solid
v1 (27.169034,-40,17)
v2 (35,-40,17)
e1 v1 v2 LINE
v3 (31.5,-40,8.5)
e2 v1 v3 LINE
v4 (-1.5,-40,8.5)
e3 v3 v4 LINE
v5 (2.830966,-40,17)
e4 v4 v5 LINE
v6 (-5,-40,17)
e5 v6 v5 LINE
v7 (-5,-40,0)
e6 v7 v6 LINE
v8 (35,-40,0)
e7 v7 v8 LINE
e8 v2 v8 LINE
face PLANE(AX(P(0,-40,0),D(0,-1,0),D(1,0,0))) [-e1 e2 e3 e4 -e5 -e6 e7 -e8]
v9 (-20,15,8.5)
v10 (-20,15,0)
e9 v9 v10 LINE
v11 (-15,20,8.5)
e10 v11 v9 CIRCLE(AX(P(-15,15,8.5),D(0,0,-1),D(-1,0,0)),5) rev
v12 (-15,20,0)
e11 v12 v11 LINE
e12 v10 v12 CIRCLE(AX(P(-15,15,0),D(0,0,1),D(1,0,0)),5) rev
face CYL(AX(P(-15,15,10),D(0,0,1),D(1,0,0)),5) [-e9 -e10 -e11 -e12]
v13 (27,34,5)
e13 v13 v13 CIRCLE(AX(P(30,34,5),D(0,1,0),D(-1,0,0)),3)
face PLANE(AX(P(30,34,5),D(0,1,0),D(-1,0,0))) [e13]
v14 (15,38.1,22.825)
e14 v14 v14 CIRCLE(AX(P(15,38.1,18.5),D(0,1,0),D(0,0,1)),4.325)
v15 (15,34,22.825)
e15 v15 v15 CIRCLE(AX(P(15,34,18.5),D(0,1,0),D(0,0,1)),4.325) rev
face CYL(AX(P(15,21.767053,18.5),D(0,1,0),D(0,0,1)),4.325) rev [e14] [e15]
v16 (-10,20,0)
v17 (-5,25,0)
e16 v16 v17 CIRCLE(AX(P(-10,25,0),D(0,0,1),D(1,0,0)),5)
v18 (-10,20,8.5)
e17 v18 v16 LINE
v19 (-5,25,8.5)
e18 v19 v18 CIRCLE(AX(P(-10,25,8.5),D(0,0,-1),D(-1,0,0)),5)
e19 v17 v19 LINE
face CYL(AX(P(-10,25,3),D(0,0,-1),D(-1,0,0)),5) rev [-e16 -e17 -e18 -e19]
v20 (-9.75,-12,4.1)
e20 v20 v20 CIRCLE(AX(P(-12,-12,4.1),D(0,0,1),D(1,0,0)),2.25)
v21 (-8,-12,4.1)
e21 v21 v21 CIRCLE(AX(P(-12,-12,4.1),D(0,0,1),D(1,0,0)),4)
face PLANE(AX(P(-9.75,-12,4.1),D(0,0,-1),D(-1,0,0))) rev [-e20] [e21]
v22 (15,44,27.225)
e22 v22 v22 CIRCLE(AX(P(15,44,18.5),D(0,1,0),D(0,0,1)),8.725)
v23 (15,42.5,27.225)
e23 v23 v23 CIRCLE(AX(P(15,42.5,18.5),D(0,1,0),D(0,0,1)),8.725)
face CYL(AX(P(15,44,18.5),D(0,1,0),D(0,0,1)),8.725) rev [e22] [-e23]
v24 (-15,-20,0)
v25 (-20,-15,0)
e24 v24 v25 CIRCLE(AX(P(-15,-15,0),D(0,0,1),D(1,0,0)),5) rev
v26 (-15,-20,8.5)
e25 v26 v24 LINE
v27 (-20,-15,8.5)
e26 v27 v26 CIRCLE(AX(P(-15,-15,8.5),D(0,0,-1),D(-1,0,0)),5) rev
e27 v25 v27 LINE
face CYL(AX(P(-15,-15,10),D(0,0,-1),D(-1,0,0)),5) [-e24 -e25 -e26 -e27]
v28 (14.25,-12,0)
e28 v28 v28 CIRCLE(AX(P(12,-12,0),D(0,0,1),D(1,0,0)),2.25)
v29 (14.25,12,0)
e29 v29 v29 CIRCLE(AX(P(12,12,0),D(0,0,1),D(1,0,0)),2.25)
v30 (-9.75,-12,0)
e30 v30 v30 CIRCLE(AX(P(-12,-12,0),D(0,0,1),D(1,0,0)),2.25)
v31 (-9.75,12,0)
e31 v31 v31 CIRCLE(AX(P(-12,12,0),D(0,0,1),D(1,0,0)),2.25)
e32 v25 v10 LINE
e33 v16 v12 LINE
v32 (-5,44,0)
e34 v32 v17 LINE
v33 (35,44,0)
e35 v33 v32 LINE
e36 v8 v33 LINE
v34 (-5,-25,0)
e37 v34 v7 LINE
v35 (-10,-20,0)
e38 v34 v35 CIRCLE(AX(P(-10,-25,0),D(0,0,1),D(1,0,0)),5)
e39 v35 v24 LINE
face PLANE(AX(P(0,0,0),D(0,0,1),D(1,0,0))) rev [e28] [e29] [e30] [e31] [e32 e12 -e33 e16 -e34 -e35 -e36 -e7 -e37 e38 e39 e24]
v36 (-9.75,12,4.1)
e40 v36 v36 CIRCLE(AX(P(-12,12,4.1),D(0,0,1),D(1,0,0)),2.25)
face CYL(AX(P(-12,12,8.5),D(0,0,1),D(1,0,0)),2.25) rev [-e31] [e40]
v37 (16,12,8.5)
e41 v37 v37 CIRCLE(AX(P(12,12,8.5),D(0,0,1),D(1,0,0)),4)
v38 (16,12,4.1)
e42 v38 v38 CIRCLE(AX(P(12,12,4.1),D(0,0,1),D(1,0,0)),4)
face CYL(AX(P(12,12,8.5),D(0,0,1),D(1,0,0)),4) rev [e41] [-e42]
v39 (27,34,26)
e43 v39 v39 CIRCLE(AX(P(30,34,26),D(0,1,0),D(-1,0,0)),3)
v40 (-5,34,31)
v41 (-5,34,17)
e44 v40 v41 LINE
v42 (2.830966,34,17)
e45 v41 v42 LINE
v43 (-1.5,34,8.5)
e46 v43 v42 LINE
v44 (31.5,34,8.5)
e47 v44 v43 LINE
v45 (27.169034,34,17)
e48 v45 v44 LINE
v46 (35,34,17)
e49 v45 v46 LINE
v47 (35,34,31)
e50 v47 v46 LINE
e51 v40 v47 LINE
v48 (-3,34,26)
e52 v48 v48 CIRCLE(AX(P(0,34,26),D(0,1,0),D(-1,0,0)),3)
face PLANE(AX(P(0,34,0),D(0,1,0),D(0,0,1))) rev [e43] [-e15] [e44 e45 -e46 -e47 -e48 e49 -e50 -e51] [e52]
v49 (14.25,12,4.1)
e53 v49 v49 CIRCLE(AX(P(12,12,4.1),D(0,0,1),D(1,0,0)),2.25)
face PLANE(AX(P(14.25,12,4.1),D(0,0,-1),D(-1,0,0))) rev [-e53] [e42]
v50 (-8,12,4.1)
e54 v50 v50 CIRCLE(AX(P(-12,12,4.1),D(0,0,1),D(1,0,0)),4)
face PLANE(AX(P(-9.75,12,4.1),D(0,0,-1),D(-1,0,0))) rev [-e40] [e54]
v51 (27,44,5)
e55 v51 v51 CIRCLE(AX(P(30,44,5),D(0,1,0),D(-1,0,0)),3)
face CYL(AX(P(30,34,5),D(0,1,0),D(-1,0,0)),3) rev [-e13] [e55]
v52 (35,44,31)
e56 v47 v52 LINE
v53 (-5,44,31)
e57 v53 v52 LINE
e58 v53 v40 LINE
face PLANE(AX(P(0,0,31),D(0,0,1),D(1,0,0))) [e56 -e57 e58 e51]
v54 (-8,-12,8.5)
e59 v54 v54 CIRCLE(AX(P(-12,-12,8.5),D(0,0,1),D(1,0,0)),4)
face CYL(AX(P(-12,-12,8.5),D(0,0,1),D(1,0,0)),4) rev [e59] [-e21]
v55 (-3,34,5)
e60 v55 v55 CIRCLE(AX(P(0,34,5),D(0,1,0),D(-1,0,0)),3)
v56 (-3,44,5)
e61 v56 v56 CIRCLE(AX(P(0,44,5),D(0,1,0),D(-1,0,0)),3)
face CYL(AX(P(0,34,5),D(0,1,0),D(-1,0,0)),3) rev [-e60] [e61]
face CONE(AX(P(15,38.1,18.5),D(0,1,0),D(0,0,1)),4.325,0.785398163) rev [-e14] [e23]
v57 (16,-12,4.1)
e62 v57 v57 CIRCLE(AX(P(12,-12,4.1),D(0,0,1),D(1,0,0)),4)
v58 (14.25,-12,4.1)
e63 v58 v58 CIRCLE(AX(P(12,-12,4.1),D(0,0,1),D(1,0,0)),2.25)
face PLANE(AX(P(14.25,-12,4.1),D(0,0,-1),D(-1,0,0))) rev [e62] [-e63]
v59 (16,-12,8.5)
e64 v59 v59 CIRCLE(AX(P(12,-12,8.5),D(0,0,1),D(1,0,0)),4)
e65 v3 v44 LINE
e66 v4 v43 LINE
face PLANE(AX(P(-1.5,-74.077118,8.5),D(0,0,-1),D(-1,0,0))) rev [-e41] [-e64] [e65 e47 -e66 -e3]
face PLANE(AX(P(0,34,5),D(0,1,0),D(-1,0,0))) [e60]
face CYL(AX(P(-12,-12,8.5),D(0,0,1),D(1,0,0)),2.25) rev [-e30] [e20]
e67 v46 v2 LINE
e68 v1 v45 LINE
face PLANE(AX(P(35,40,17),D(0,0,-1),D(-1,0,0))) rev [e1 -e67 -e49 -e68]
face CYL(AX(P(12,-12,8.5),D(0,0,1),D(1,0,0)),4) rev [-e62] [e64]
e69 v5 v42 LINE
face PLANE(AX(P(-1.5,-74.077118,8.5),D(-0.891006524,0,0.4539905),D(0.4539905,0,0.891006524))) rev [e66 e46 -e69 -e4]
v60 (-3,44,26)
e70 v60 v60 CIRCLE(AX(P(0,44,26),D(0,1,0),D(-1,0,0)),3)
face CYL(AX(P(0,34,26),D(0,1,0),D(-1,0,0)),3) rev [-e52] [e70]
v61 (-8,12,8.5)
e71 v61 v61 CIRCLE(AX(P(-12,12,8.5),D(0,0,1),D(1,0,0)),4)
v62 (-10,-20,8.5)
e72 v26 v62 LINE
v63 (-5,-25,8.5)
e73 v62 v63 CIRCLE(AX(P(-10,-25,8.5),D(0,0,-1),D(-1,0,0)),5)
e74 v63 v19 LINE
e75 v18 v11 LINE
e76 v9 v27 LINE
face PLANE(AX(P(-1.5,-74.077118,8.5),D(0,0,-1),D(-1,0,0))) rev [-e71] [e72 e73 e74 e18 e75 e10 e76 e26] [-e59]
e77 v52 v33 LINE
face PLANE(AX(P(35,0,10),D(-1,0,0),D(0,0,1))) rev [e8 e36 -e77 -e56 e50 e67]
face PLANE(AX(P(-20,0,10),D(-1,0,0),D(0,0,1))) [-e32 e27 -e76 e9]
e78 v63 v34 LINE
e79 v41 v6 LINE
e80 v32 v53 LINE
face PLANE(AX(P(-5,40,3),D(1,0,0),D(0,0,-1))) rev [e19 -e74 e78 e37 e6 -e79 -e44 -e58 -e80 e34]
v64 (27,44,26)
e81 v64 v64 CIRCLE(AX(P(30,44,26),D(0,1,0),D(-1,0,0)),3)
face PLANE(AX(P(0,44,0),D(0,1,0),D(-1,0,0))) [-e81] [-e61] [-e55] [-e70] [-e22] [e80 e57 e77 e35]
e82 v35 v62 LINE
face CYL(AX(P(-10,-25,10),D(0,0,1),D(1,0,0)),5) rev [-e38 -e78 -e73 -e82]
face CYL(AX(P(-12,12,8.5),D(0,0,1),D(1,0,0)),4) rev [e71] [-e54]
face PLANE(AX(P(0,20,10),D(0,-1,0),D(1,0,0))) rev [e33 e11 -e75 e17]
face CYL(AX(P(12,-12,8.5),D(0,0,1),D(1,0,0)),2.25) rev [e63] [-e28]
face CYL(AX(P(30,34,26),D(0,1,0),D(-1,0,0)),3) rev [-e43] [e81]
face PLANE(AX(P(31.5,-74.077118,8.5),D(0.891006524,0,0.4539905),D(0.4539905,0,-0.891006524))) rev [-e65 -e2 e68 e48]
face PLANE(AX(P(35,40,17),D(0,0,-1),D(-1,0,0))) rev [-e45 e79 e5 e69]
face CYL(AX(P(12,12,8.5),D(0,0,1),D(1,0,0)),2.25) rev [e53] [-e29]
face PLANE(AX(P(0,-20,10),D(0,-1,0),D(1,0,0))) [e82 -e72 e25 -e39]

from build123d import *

# Parameters (mm, degrees)
BOSS_EXTRUDE1_OUTLINE_W                             = 55
BOSS_EXTRUDE1_OUTLINE_H                             = 40
BOSS_EXTRUDE1_DEPTH                                 = 10
SKETCH5_W                                           = 40
SKETCH5_H                                           = 14
BOSS_EXTRUDE2_DEPTH                                 = 40
CUT_EXTRUDE3_DEPTH                                  = 74
SKETCH7_W                                           = 40
SKETCH7_H                                           = 6
BOSS_EXTRUDE3_DEPTH                                 = 14
SKETCH11_W                                          = 40
SKETCH11_H                                          = 28
BOSS_EXTRUDE5_DEPTH                                 = 4
SKETCH12_W                                          = 40
SKETCH12_H                                          = 24
SKETCH12_H_2                                        = 20
BOSS_EXTRUDE6_DEPTH                                 = 3
FILLET1_R                                           = 5
SKETCH23_R                                          = 3
CUT_EXTRUDE11_DEPTH                                 = 10
SKETCH26_R                                          = 4.325
CUT_EXTRUDE12_DEPTH                                 = 4.1
CUT_EXTRUDE13_DEPTH                                 = 1.5
CBORE_FOR_M4_HEX_SOCKET_HEAD_CAP_SCREW1_D           = 4.5
CBORE_FOR_M4_HEX_SOCKET_HEAD_CAP_SCREW1_CBORE_D     = 8
CBORE_FOR_M4_HEX_SOCKET_HEAD_CAP_SCREW1_CBORE_DEPTH = 4.4


# Read off the part's stored shape, not the designer's step: Boss-Extrude1
with BuildPart() as part:
    # Boss-Extrude1 outline → Boss-Extrude1 (new body)
    with BuildSketch(Plane.XY):
        with Locations((7.5, 0)):
            Rectangle(BOSS_EXTRUDE1_OUTLINE_W, BOSS_EXTRUDE1_OUTLINE_H)
    extrude(amount=BOSS_EXTRUDE1_DEPTH)

    # Sketch5 → Boss-Extrude2 (add, symmetric)
    with BuildSketch(Plane(origin=(0, 0, 0), x_dir=(1, 0, 0), z_dir=(0, 1, 0))):
        with Locations((15, -10)):
            Rectangle(SKETCH5_W, SKETCH5_H)
    extrude(amount=BOSS_EXTRUDE2_DEPTH, both=True)

    # Sketch6 → Cut-Extrude3 (cut)
    with BuildSketch(Plane(origin=(0, 34, 0), x_dir=(1, 0, 0), z_dir=(0, 1, 0))):
        Polygon((-1.5, -8.5), (31.5, -8.5), (27.169033679, -17), (2.830966321, -17), align=None)
    extrude(amount=-CUT_EXTRUDE3_DEPTH, mode=Mode.SUBTRACT)

    # Sketch7 → Boss-Extrude3 (add)
    with BuildSketch(Plane.XY.offset(17)):
        with Locations((15, 37)):
            Rectangle(SKETCH7_W, SKETCH7_H)
    extrude(amount=BOSS_EXTRUDE3_DEPTH)

    # Sketch11 → Boss-Extrude5 (add)
    with BuildSketch(Plane(origin=(0, 40, 0), x_dir=(1, 0, 0), z_dir=(0, 1, 0))):
        with Locations((15, -17)):
            Rectangle(SKETCH11_W, SKETCH11_H)
    extrude(amount=BOSS_EXTRUDE5_DEPTH)

    # Sketch12 → Boss-Extrude6 (add)
    with BuildSketch(Plane(origin=(0, 0, 3), x_dir=(-1, 0, 0), z_dir=(0, 0, -1))):
        with Locations((-15, 32)):
            Rectangle(SKETCH12_W, SKETCH12_H)
        with Locations((-15, -30)):
            Rectangle(SKETCH12_W, SKETCH12_H_2)
    extrude(amount=BOSS_EXTRUDE6_DEPTH)

    # Fillet1
    fillet1_edges = [part.edges().sort_by_distance(p)[0] for p in [
        (-5, -20, 5),
        (-5, 20, 5),
        (-20, 20, 5),
        (-20, -20, 5),
    ]]
    fillet(fillet1_edges, radius=FILLET1_R)

    # Sketch23 → Cut-Extrude11 (cut)
    with BuildSketch(Plane(origin=(0, 44, 0), x_dir=(1, 0, 0), z_dir=(0, 1, 0))):
        with Locations(Location((0, -5, 0), (0, 0, 180))):
            Circle(SKETCH23_R)
        with Locations(Location((30, -5, 0), (0, 0, 180))):
            Circle(SKETCH23_R)
        with Locations(Location((30, -26, 0), (0, 0, 180))):
            Circle(SKETCH23_R)
        with Locations(Location((0, -26, 0), (0, 0, 180))):
            Circle(SKETCH23_R)
    extrude(amount=-CUT_EXTRUDE11_DEPTH, mode=Mode.SUBTRACT)

    # Sketch25 → Cut-Revolve1 (revolve, cut)
    with BuildSketch(Plane.XY.offset(18.5), mode=Mode.PRIVATE) as cut_revolve1_sk:
        Polygon((15, 44), (15, 38.1), (19.325, 38.1), (23.725, 42.5), (23.725, 44), align=None)
    revolve(cut_revolve1_sk.sketch.rotate(Axis((15, 44, 18.5), (0, -1, 0)), 90), axis=Axis((15, 44, 18.5), (0, -1, 0)), mode=Mode.SUBTRACT)

    # Sketch26 → Cut-Extrude12 (cut)
    with BuildSketch(Plane(origin=(0, 38.1, 0), x_dir=(1, 0, 0), z_dir=(0, 1, 0))):
        with Locations(Location((15, -18.5, 0), (0, 0, 270))):
            Circle(SKETCH26_R)
    extrude(amount=-CUT_EXTRUDE12_DEPTH, mode=Mode.SUBTRACT)

    # Sketch28 → Cut-Extrude13 (cut)
    with BuildSketch(Plane.XY.offset(10)):
        with BuildLine():
            Line((-15, -20), (-10, -20))
            ThreePointArc((-10, -20), (-6.464466094, -21.464466094), (-5, -25))
            Line((-5, -25), (-5, 25))
            ThreePointArc((-5, 25), (-6.464466094, 21.464466094), (-10, 20))
            Line((-10, 20), (-15, 20))
            ThreePointArc((-15, 20), (-18.535533906, 18.535533906), (-20, 15))
            Line((-20, 15), (-20, -15))
            ThreePointArc((-20, -15), (-18.535533906, -18.535533906), (-15, -20))
        make_face()
    extrude(amount=-CUT_EXTRUDE13_DEPTH, mode=Mode.SUBTRACT)

    # CBORE for M4 Hex Socket Head Cap Screw1 (through all)
    with Locations(Plane.XY.offset(8.5)):
        with Locations((-12, 12), (12, 12), (12, -12), (-12, -12)):
            CounterBoreHole(CBORE_FOR_M4_HEX_SOCKET_HEAD_CAP_SCREW1_D / 2, CBORE_FOR_M4_HEX_SOCKET_HEAD_CAP_SCREW1_CBORE_D / 2, CBORE_FOR_M4_HEX_SOCKET_HEAD_CAP_SCREW1_CBORE_DEPTH)


solid = part.part
